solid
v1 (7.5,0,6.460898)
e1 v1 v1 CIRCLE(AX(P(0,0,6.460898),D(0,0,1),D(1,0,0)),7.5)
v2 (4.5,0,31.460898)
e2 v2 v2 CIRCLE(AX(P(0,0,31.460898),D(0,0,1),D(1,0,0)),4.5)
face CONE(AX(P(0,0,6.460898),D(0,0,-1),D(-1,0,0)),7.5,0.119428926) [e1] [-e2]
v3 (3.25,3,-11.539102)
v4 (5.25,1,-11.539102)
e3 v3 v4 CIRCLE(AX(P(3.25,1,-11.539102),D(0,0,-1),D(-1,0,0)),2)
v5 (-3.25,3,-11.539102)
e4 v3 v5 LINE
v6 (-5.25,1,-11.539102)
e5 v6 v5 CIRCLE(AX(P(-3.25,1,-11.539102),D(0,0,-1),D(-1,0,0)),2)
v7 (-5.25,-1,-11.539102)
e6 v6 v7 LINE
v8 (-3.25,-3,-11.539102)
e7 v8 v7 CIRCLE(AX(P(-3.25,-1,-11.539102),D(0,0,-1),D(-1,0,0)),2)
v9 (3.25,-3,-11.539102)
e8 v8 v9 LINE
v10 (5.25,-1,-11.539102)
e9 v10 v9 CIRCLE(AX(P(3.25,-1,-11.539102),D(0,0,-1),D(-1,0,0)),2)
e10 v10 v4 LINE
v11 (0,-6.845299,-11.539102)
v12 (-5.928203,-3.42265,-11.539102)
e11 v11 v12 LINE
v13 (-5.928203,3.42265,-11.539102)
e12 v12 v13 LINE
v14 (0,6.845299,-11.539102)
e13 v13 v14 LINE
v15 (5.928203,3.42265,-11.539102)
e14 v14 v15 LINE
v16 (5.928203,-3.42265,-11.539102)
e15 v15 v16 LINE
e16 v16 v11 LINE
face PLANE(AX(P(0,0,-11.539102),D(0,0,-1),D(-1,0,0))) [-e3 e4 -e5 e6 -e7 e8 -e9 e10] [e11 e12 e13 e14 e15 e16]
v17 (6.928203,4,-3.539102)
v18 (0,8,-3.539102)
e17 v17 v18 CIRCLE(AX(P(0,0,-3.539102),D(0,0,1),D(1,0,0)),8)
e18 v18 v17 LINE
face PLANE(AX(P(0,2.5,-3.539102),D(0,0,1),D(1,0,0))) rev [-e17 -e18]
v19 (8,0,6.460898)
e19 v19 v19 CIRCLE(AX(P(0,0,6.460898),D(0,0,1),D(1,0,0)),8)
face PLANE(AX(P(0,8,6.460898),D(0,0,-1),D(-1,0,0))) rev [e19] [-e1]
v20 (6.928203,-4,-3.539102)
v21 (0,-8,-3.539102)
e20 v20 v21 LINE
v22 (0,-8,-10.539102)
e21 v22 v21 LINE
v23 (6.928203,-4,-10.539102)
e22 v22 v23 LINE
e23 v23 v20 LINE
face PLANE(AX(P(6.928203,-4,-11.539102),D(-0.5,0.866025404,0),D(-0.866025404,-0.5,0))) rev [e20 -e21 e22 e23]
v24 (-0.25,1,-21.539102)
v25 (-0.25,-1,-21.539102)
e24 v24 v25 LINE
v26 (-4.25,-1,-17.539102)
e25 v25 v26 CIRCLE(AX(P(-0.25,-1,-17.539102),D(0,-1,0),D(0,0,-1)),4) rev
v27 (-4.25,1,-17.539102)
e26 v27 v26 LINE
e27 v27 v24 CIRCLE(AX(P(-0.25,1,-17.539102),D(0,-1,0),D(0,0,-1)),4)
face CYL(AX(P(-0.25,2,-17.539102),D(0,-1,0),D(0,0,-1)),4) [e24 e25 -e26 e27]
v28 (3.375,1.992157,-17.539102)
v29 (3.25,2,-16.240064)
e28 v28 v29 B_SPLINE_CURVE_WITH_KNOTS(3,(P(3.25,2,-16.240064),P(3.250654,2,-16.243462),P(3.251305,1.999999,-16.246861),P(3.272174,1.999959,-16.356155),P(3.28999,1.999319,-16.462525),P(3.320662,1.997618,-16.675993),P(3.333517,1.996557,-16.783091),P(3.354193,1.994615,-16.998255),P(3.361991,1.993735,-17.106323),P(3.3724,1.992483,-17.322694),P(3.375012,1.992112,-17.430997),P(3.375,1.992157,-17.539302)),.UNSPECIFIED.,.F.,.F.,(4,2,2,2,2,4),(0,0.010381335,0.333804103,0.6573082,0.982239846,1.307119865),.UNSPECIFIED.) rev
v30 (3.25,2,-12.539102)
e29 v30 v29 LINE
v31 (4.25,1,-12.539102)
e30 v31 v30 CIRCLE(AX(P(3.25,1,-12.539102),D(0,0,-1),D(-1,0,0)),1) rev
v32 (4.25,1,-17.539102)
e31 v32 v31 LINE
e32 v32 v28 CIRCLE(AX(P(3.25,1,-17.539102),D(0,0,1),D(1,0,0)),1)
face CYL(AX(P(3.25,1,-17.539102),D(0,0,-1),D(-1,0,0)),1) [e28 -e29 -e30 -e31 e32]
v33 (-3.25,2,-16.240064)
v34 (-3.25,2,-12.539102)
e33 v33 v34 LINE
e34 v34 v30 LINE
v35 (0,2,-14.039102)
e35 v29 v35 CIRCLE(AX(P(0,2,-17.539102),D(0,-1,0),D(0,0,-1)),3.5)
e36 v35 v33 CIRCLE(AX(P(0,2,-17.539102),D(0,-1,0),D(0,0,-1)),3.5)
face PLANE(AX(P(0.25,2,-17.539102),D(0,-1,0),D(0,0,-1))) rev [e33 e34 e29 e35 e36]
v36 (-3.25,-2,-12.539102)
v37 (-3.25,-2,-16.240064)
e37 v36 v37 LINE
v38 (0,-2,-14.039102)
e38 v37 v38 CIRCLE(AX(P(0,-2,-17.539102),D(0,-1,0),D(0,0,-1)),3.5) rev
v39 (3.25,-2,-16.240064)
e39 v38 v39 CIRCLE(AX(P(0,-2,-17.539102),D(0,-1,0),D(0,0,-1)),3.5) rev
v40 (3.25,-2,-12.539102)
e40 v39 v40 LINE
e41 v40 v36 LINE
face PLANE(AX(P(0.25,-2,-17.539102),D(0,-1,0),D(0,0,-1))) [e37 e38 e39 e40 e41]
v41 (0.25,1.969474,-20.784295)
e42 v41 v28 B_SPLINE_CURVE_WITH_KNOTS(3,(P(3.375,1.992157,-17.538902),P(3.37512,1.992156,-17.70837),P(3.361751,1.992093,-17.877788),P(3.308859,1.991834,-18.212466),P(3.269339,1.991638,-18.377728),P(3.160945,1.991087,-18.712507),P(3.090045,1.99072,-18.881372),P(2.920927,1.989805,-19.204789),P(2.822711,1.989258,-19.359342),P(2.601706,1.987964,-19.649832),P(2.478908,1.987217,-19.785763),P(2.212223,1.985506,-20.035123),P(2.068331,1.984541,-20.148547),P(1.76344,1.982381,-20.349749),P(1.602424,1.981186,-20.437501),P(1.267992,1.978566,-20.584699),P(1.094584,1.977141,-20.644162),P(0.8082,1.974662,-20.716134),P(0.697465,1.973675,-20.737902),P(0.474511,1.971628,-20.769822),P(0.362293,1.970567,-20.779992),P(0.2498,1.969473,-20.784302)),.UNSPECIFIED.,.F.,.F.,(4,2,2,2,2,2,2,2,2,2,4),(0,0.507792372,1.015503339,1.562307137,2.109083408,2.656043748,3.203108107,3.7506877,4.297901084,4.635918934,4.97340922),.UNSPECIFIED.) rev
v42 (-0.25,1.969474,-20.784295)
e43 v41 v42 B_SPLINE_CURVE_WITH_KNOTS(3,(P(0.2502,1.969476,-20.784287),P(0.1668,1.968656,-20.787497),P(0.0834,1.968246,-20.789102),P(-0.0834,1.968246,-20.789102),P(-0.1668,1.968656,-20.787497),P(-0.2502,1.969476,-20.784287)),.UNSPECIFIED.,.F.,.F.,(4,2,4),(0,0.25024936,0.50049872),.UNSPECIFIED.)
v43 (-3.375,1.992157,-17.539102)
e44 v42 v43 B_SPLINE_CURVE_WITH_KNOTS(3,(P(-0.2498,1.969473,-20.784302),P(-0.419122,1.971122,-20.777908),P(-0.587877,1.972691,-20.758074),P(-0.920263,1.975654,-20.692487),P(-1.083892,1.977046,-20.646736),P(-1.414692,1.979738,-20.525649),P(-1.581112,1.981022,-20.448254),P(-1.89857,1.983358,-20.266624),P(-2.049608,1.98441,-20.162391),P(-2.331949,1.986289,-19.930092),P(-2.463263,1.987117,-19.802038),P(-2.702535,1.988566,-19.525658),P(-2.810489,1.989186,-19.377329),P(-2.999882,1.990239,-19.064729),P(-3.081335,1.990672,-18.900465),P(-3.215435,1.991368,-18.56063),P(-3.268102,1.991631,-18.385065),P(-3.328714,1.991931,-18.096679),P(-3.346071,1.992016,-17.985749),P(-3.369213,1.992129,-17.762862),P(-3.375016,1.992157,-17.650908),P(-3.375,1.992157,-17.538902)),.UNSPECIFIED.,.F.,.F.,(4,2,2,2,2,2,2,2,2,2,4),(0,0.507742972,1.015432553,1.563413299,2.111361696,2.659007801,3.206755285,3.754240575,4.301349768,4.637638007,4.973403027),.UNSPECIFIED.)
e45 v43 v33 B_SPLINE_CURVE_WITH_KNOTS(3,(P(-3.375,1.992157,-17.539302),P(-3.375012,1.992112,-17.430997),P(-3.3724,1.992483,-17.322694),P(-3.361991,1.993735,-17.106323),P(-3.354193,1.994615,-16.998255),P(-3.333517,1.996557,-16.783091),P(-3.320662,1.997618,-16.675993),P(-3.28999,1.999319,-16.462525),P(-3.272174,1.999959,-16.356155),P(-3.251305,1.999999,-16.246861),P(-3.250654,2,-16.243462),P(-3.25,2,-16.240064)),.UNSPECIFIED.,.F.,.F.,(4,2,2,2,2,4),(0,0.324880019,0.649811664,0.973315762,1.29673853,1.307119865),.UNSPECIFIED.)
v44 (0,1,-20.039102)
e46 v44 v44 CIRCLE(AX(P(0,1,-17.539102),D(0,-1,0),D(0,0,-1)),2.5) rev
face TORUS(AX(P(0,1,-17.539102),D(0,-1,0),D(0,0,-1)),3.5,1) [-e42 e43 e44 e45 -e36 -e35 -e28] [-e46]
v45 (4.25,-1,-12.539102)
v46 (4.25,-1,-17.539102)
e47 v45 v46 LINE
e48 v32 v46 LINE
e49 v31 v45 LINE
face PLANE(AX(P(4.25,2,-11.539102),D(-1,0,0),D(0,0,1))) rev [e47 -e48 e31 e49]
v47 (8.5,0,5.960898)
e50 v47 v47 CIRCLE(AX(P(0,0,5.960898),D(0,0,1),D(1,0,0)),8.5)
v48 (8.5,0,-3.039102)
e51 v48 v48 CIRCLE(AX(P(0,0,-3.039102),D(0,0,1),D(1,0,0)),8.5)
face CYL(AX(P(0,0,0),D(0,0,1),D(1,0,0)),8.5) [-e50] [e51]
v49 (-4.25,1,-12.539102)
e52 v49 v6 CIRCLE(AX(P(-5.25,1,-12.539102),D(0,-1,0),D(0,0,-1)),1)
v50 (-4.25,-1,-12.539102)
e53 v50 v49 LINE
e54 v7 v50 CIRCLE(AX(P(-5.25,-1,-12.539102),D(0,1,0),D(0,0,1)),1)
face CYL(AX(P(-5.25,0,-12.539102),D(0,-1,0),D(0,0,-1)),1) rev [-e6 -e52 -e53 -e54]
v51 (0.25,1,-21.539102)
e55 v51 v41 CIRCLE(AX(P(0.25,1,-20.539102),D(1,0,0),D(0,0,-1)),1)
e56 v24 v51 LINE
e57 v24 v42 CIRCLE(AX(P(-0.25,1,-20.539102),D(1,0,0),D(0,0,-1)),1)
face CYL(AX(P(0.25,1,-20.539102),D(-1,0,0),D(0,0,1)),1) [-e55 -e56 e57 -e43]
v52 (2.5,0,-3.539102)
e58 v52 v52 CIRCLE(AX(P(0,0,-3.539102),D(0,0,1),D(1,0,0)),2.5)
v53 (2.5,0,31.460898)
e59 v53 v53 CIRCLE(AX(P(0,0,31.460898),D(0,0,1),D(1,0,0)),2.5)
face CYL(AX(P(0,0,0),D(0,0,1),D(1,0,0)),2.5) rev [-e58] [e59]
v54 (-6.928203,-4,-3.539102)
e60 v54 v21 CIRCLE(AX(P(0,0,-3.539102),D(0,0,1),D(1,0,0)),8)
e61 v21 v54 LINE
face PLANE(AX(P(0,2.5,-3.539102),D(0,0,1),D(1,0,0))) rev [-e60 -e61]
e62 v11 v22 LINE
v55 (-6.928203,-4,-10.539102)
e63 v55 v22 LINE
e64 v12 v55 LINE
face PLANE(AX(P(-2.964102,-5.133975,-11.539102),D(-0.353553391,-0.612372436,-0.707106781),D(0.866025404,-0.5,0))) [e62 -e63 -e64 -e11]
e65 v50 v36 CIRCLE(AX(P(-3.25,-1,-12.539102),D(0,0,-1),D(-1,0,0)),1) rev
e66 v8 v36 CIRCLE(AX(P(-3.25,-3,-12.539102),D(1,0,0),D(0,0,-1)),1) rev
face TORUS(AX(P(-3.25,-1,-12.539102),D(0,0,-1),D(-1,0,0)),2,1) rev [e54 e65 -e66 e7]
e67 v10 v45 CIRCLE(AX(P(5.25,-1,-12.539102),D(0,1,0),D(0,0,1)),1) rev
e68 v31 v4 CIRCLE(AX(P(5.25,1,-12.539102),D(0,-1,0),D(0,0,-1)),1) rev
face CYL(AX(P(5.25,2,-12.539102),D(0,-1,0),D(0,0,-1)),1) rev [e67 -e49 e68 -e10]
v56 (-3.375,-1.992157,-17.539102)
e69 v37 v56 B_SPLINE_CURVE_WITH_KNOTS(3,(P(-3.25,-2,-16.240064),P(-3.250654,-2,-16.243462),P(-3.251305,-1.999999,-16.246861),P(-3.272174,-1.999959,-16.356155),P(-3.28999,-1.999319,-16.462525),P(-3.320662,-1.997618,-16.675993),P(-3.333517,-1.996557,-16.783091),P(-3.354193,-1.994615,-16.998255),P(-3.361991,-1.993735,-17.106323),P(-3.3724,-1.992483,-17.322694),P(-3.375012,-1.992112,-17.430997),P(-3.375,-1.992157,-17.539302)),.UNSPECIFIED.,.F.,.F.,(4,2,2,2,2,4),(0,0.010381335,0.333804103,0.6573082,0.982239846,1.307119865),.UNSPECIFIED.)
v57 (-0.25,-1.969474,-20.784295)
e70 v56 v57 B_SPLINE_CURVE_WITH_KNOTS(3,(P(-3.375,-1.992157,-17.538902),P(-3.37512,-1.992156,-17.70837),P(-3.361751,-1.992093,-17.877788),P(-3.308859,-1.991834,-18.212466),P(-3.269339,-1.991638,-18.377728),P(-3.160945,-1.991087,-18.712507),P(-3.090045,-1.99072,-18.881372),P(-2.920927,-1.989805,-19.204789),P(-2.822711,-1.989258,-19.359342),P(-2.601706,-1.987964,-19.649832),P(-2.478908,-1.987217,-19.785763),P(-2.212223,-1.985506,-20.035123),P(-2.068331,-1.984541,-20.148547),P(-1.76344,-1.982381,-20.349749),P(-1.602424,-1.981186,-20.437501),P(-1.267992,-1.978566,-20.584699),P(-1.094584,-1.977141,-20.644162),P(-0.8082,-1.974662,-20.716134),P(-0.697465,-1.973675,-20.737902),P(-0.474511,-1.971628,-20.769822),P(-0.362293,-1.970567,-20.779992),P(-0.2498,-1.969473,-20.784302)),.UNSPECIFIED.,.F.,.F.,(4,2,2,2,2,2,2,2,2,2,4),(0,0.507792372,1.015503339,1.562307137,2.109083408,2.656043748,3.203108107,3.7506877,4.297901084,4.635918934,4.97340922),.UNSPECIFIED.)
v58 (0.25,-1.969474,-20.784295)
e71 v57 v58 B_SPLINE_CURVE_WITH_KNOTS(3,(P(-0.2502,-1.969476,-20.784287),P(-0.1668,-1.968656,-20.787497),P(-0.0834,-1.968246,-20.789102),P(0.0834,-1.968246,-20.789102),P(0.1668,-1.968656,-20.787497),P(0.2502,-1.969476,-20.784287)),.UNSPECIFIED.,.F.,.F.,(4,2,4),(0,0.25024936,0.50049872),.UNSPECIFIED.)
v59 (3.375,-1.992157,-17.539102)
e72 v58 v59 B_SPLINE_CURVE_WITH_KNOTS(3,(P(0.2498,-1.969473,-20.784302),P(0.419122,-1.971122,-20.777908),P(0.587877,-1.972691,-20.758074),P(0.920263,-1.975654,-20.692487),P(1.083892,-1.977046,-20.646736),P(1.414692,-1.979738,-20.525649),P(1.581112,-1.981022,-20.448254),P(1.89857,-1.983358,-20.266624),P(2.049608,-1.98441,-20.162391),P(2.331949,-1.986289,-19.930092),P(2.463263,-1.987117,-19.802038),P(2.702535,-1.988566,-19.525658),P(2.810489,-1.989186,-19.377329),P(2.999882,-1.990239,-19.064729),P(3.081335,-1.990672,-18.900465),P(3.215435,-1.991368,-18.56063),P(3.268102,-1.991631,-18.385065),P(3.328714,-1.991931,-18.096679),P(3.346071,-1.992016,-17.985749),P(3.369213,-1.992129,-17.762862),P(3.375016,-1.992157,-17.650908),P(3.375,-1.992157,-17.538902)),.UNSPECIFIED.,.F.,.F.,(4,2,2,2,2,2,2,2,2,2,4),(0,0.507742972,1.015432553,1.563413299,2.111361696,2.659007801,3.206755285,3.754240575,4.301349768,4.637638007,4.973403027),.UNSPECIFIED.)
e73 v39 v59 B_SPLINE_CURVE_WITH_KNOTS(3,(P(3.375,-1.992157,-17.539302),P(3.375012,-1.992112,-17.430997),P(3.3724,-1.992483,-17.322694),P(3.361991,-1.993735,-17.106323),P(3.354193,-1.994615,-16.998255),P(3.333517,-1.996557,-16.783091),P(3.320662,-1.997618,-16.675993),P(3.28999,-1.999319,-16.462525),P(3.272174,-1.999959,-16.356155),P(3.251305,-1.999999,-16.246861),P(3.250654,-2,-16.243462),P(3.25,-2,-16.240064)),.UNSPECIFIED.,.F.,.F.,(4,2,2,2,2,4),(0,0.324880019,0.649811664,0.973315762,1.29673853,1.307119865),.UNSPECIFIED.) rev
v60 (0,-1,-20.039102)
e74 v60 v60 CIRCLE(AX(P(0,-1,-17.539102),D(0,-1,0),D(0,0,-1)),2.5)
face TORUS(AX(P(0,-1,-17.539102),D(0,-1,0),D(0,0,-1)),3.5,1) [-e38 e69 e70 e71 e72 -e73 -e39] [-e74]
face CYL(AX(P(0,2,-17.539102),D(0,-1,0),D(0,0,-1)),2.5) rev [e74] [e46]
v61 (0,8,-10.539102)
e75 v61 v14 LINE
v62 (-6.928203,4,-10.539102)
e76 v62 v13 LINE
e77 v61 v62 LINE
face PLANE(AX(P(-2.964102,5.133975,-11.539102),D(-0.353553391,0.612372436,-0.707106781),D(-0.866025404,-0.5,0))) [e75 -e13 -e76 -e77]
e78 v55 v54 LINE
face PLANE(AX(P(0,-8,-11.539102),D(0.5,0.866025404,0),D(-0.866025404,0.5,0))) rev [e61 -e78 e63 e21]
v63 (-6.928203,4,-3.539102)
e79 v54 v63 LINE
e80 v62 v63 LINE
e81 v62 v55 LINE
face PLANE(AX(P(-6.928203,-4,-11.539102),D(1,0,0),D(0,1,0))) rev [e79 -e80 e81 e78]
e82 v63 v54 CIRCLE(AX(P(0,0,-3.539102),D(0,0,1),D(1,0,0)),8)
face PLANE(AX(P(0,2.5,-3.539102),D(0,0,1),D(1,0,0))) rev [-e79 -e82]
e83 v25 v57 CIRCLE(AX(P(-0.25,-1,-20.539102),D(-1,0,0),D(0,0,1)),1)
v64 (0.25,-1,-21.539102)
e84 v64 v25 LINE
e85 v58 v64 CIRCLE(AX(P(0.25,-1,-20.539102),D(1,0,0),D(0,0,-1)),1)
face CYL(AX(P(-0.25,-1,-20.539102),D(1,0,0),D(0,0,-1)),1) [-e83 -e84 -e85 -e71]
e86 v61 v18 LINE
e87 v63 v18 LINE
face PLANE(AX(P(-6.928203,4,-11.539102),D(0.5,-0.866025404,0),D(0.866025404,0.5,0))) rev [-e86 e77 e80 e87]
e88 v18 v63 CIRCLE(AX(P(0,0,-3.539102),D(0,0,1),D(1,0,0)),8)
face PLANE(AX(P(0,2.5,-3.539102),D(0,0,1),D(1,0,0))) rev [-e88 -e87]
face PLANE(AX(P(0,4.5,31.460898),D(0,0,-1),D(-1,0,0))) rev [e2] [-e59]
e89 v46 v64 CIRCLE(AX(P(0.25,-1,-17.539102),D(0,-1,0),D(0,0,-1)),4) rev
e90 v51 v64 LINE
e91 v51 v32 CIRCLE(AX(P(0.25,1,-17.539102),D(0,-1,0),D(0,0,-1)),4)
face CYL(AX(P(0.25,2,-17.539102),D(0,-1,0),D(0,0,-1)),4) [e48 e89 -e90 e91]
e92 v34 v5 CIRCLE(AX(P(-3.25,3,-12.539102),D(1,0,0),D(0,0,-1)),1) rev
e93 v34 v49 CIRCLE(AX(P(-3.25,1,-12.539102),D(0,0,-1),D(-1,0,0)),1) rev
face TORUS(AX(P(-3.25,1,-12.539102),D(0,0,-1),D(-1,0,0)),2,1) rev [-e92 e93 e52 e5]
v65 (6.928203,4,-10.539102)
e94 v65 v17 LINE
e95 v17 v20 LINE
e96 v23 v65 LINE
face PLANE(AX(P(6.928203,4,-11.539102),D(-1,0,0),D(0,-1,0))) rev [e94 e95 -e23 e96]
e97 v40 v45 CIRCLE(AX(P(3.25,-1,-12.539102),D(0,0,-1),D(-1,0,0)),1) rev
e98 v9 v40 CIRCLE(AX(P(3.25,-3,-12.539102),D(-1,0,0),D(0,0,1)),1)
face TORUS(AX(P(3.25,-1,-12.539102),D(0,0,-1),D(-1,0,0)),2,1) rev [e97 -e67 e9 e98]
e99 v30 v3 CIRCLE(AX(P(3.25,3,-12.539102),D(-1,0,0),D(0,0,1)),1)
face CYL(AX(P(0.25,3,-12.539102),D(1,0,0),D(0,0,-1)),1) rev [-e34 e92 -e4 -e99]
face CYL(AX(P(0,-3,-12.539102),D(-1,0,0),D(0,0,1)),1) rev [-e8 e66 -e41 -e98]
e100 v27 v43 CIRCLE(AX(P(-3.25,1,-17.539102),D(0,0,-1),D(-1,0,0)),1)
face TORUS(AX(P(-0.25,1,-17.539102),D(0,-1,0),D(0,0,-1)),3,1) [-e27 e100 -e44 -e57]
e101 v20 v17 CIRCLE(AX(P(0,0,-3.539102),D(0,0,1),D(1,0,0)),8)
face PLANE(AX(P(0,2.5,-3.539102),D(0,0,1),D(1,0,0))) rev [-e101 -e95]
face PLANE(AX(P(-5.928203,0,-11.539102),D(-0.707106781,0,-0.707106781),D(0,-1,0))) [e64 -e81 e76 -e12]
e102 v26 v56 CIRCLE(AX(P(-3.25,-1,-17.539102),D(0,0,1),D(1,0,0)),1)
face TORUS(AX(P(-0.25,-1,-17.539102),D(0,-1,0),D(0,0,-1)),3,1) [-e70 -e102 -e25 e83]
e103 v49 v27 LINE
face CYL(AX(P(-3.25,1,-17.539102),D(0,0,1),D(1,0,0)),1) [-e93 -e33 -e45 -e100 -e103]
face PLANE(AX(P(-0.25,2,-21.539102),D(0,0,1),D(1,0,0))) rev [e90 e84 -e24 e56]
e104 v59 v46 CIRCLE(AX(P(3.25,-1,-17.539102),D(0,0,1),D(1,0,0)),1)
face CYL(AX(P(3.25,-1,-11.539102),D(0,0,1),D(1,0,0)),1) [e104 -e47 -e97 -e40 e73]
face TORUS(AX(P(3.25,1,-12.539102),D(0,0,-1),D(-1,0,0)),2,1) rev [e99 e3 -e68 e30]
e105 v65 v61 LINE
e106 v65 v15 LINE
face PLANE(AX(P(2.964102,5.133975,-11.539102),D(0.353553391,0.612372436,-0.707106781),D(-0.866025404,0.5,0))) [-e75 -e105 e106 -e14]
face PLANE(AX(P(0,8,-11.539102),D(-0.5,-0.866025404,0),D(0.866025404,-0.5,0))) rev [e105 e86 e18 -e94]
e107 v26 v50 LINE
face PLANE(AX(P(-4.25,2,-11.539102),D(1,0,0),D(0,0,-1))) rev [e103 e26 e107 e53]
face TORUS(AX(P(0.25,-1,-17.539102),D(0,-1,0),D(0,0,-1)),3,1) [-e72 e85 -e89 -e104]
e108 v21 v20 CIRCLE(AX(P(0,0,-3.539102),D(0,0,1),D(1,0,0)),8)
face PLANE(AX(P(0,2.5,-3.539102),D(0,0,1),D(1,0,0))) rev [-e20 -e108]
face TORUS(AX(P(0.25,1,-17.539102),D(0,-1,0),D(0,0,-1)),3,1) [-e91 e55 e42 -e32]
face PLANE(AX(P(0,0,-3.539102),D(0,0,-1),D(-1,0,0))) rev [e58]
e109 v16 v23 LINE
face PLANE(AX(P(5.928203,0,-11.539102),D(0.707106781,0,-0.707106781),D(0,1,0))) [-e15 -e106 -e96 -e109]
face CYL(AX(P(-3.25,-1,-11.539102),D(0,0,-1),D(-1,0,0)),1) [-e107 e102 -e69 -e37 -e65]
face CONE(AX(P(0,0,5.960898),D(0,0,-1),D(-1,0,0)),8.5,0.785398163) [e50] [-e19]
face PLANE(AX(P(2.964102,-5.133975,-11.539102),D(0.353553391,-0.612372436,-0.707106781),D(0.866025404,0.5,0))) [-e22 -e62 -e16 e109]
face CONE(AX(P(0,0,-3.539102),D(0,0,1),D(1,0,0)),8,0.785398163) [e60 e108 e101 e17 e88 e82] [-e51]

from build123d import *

# Parameters (mm, degrees)
EXTRUDE_2_DEPTH = 8
CHAMFER_1_SIZE  = 1
SKETCH_5_R      = 2.5
EXTRUDE_3_DEPTH = 2
FILLET_3_R      = 1


with BuildPart() as part:
    # 草图2 → 旋转1 (revolve)
    with BuildSketch(Plane(origin=(0, 0, 0), x_dir=(0, 0, -1), z_dir=(1, 0, 0)), mode=Mode.PRIVATE) as revolve_1_sk:
        Polygon((3.53910226, 2.5), (3.53910226, 8), (3.03910226, 8.5), (-5.96089774, 8.5), (-6.46089774, 8), (-6.46089774, 7.5), (-31.46089774, 4.5), (-31.46089774, 2.5), align=None)
    revolve(revolve_1_sk.sketch.rotate(Axis((0, 0, 0), (0, 0, -1)), 90), axis=Axis((0, 0, 0), (0, 0, -1)))

    # 草图4 → 凸台-拉伸2 (add)
    with BuildSketch(Plane(origin=(0, 0, -3.53910226), x_dir=(-1, 0, 0), z_dir=(0, 0, -1))):
        Polygon((0, 8), (-6.92820323, 4), (-6.92820323, -4), (0, -8), (6.92820323, -4), (6.92820323, 4), align=None)
    extrude(amount=EXTRUDE_2_DEPTH)

    # 倒角1
    chamfer_1_edges = [part.edges().sort_by_distance(p)[0] for p in [
        (-3.464101615, 6, -11.53910226),
        (3.464101615, 6, -11.53910226),
        (6.92820323, 0, -11.53910226),
        (3.464101615, -6, -11.53910226),
        (-3.464101615, -6, -11.53910226),
        (-6.92820323, 0, -11.53910226),
    ]]
    chamfer(chamfer_1_edges, length=CHAMFER_1_SIZE)

    # 草图5 → 凸台-拉伸3 (add, symmetric)
    with BuildSketch(Plane(origin=(0, 0, 0), x_dir=(1, 0, 0), z_dir=(0, 1, 0))):
        with BuildLine():
            Line((-4.25, 11.53910226), (4.25, 11.53910226))
            Line((4.25, 11.53910226), (4.25, 17.53910226))
            ThreePointArc((4.25, 17.53910226), (3.078427125, 20.367529385), (0.25, 21.53910226))
            Line((0.25, 21.53910226), (-0.25, 21.53910226))
            ThreePointArc((-0.25, 21.53910226), (-3.078427125, 20.367529385), (-4.25, 17.53910226))
            Line((-4.25, 17.53910226), (-4.25, 11.53910226))
        make_face()
        with Locations(Location((0, 17.53910226, 0), (0, 0, 270))):
            Circle(SKETCH_5_R, mode=Mode.SUBTRACT)
    extrude(amount=EXTRUDE_3_DEPTH, both=True)

    # 圆角3
    fillet_3_edges = [part.edges().sort_by_distance(p)[0] for p in [
        (-4.25, -2, -14.53910226),
        (4.25, -2, -14.53910226),
        (3.078427125, -2, -20.367529385),
        (0, -2, -21.53910226),
        (-3.078427125, -2, -20.367529385),
    ]]
    fillet(fillet_3_edges, radius=FILLET_3_R)
    fillet_3_2_edges = [part.edges().sort_by_distance(p)[0] for p in [
        (-4.25, 2, -14.53910226),
        (4.25, 2, -14.53910226),
        (3.078427125, 2, -20.367529385),
        (0, 2, -21.53910226),
        (-3.078427125, 2, -20.367529385),
    ]]
    fillet(fillet_3_2_edges, radius=FILLET_3_R)
    fillet_3_3_edges = [part.edges().sort_by_distance(p)[0] for p in [
        (0, 2, -11.53910226),
    ]]
    fillet(fillet_3_3_edges, radius=FILLET_3_R)
    # the kernel refuses this fillet: 1 mm, written as the material it takes off along each edge
    with BuildSketch(Plane(origin=(0, 2, -17.53910226), x_dir=(0, 0, 1), z_dir=(-1, 0, 0))) as fillet_3_4_piece_1:
        with BuildLine():
            CenterArc((2.5 + FILLET_3_R, -FILLET_3_R), FILLET_3_R, 90, 90)
            Line((2.5, -FILLET_3_R), (2.5 - FILLET_3_R * 0.02, -FILLET_3_R))
            Line((2.5 - FILLET_3_R * 0.02, -FILLET_3_R), (2.5 - FILLET_3_R * 0.02, FILLET_3_R * 0.02))
            Line((2.5 - FILLET_3_R * 0.02, FILLET_3_R * 0.02), (2.5 + FILLET_3_R, FILLET_3_R * 0.02))
            Line((2.5 + FILLET_3_R, FILLET_3_R * 0.02), (2.5 + FILLET_3_R, 0))
        make_face()
    revolve(axis=Axis((0, 2, -17.53910226), (0, 1, 0)), mode=Mode.SUBTRACT)
    # the kernel refuses this fillet: 1 mm, written as the material it takes off along each edge
    with BuildSketch(Plane(origin=(0, -2, -17.53910226), x_dir=(0, 0, 1), z_dir=(-1, 0, 0))) as fillet_3_5_piece_1:
        with BuildLine():
            CenterArc((2.5 + FILLET_3_R, FILLET_3_R), FILLET_3_R, 180, 90)
            Line((2.5, FILLET_3_R), (2.5 - FILLET_3_R * 0.02, FILLET_3_R))
            Line((2.5 - FILLET_3_R * 0.02, FILLET_3_R), (2.5 - FILLET_3_R * 0.02, -FILLET_3_R * 0.02))
            Line((2.5 - FILLET_3_R * 0.02, -FILLET_3_R * 0.02), (2.5 + FILLET_3_R, -FILLET_3_R * 0.02))
            Line((2.5 + FILLET_3_R, -FILLET_3_R * 0.02), (2.5 + FILLET_3_R, 0))
        make_face()
    revolve(axis=Axis((0, -2, -17.53910226), (0, 1, 0)), mode=Mode.SUBTRACT)


solid = part.part
